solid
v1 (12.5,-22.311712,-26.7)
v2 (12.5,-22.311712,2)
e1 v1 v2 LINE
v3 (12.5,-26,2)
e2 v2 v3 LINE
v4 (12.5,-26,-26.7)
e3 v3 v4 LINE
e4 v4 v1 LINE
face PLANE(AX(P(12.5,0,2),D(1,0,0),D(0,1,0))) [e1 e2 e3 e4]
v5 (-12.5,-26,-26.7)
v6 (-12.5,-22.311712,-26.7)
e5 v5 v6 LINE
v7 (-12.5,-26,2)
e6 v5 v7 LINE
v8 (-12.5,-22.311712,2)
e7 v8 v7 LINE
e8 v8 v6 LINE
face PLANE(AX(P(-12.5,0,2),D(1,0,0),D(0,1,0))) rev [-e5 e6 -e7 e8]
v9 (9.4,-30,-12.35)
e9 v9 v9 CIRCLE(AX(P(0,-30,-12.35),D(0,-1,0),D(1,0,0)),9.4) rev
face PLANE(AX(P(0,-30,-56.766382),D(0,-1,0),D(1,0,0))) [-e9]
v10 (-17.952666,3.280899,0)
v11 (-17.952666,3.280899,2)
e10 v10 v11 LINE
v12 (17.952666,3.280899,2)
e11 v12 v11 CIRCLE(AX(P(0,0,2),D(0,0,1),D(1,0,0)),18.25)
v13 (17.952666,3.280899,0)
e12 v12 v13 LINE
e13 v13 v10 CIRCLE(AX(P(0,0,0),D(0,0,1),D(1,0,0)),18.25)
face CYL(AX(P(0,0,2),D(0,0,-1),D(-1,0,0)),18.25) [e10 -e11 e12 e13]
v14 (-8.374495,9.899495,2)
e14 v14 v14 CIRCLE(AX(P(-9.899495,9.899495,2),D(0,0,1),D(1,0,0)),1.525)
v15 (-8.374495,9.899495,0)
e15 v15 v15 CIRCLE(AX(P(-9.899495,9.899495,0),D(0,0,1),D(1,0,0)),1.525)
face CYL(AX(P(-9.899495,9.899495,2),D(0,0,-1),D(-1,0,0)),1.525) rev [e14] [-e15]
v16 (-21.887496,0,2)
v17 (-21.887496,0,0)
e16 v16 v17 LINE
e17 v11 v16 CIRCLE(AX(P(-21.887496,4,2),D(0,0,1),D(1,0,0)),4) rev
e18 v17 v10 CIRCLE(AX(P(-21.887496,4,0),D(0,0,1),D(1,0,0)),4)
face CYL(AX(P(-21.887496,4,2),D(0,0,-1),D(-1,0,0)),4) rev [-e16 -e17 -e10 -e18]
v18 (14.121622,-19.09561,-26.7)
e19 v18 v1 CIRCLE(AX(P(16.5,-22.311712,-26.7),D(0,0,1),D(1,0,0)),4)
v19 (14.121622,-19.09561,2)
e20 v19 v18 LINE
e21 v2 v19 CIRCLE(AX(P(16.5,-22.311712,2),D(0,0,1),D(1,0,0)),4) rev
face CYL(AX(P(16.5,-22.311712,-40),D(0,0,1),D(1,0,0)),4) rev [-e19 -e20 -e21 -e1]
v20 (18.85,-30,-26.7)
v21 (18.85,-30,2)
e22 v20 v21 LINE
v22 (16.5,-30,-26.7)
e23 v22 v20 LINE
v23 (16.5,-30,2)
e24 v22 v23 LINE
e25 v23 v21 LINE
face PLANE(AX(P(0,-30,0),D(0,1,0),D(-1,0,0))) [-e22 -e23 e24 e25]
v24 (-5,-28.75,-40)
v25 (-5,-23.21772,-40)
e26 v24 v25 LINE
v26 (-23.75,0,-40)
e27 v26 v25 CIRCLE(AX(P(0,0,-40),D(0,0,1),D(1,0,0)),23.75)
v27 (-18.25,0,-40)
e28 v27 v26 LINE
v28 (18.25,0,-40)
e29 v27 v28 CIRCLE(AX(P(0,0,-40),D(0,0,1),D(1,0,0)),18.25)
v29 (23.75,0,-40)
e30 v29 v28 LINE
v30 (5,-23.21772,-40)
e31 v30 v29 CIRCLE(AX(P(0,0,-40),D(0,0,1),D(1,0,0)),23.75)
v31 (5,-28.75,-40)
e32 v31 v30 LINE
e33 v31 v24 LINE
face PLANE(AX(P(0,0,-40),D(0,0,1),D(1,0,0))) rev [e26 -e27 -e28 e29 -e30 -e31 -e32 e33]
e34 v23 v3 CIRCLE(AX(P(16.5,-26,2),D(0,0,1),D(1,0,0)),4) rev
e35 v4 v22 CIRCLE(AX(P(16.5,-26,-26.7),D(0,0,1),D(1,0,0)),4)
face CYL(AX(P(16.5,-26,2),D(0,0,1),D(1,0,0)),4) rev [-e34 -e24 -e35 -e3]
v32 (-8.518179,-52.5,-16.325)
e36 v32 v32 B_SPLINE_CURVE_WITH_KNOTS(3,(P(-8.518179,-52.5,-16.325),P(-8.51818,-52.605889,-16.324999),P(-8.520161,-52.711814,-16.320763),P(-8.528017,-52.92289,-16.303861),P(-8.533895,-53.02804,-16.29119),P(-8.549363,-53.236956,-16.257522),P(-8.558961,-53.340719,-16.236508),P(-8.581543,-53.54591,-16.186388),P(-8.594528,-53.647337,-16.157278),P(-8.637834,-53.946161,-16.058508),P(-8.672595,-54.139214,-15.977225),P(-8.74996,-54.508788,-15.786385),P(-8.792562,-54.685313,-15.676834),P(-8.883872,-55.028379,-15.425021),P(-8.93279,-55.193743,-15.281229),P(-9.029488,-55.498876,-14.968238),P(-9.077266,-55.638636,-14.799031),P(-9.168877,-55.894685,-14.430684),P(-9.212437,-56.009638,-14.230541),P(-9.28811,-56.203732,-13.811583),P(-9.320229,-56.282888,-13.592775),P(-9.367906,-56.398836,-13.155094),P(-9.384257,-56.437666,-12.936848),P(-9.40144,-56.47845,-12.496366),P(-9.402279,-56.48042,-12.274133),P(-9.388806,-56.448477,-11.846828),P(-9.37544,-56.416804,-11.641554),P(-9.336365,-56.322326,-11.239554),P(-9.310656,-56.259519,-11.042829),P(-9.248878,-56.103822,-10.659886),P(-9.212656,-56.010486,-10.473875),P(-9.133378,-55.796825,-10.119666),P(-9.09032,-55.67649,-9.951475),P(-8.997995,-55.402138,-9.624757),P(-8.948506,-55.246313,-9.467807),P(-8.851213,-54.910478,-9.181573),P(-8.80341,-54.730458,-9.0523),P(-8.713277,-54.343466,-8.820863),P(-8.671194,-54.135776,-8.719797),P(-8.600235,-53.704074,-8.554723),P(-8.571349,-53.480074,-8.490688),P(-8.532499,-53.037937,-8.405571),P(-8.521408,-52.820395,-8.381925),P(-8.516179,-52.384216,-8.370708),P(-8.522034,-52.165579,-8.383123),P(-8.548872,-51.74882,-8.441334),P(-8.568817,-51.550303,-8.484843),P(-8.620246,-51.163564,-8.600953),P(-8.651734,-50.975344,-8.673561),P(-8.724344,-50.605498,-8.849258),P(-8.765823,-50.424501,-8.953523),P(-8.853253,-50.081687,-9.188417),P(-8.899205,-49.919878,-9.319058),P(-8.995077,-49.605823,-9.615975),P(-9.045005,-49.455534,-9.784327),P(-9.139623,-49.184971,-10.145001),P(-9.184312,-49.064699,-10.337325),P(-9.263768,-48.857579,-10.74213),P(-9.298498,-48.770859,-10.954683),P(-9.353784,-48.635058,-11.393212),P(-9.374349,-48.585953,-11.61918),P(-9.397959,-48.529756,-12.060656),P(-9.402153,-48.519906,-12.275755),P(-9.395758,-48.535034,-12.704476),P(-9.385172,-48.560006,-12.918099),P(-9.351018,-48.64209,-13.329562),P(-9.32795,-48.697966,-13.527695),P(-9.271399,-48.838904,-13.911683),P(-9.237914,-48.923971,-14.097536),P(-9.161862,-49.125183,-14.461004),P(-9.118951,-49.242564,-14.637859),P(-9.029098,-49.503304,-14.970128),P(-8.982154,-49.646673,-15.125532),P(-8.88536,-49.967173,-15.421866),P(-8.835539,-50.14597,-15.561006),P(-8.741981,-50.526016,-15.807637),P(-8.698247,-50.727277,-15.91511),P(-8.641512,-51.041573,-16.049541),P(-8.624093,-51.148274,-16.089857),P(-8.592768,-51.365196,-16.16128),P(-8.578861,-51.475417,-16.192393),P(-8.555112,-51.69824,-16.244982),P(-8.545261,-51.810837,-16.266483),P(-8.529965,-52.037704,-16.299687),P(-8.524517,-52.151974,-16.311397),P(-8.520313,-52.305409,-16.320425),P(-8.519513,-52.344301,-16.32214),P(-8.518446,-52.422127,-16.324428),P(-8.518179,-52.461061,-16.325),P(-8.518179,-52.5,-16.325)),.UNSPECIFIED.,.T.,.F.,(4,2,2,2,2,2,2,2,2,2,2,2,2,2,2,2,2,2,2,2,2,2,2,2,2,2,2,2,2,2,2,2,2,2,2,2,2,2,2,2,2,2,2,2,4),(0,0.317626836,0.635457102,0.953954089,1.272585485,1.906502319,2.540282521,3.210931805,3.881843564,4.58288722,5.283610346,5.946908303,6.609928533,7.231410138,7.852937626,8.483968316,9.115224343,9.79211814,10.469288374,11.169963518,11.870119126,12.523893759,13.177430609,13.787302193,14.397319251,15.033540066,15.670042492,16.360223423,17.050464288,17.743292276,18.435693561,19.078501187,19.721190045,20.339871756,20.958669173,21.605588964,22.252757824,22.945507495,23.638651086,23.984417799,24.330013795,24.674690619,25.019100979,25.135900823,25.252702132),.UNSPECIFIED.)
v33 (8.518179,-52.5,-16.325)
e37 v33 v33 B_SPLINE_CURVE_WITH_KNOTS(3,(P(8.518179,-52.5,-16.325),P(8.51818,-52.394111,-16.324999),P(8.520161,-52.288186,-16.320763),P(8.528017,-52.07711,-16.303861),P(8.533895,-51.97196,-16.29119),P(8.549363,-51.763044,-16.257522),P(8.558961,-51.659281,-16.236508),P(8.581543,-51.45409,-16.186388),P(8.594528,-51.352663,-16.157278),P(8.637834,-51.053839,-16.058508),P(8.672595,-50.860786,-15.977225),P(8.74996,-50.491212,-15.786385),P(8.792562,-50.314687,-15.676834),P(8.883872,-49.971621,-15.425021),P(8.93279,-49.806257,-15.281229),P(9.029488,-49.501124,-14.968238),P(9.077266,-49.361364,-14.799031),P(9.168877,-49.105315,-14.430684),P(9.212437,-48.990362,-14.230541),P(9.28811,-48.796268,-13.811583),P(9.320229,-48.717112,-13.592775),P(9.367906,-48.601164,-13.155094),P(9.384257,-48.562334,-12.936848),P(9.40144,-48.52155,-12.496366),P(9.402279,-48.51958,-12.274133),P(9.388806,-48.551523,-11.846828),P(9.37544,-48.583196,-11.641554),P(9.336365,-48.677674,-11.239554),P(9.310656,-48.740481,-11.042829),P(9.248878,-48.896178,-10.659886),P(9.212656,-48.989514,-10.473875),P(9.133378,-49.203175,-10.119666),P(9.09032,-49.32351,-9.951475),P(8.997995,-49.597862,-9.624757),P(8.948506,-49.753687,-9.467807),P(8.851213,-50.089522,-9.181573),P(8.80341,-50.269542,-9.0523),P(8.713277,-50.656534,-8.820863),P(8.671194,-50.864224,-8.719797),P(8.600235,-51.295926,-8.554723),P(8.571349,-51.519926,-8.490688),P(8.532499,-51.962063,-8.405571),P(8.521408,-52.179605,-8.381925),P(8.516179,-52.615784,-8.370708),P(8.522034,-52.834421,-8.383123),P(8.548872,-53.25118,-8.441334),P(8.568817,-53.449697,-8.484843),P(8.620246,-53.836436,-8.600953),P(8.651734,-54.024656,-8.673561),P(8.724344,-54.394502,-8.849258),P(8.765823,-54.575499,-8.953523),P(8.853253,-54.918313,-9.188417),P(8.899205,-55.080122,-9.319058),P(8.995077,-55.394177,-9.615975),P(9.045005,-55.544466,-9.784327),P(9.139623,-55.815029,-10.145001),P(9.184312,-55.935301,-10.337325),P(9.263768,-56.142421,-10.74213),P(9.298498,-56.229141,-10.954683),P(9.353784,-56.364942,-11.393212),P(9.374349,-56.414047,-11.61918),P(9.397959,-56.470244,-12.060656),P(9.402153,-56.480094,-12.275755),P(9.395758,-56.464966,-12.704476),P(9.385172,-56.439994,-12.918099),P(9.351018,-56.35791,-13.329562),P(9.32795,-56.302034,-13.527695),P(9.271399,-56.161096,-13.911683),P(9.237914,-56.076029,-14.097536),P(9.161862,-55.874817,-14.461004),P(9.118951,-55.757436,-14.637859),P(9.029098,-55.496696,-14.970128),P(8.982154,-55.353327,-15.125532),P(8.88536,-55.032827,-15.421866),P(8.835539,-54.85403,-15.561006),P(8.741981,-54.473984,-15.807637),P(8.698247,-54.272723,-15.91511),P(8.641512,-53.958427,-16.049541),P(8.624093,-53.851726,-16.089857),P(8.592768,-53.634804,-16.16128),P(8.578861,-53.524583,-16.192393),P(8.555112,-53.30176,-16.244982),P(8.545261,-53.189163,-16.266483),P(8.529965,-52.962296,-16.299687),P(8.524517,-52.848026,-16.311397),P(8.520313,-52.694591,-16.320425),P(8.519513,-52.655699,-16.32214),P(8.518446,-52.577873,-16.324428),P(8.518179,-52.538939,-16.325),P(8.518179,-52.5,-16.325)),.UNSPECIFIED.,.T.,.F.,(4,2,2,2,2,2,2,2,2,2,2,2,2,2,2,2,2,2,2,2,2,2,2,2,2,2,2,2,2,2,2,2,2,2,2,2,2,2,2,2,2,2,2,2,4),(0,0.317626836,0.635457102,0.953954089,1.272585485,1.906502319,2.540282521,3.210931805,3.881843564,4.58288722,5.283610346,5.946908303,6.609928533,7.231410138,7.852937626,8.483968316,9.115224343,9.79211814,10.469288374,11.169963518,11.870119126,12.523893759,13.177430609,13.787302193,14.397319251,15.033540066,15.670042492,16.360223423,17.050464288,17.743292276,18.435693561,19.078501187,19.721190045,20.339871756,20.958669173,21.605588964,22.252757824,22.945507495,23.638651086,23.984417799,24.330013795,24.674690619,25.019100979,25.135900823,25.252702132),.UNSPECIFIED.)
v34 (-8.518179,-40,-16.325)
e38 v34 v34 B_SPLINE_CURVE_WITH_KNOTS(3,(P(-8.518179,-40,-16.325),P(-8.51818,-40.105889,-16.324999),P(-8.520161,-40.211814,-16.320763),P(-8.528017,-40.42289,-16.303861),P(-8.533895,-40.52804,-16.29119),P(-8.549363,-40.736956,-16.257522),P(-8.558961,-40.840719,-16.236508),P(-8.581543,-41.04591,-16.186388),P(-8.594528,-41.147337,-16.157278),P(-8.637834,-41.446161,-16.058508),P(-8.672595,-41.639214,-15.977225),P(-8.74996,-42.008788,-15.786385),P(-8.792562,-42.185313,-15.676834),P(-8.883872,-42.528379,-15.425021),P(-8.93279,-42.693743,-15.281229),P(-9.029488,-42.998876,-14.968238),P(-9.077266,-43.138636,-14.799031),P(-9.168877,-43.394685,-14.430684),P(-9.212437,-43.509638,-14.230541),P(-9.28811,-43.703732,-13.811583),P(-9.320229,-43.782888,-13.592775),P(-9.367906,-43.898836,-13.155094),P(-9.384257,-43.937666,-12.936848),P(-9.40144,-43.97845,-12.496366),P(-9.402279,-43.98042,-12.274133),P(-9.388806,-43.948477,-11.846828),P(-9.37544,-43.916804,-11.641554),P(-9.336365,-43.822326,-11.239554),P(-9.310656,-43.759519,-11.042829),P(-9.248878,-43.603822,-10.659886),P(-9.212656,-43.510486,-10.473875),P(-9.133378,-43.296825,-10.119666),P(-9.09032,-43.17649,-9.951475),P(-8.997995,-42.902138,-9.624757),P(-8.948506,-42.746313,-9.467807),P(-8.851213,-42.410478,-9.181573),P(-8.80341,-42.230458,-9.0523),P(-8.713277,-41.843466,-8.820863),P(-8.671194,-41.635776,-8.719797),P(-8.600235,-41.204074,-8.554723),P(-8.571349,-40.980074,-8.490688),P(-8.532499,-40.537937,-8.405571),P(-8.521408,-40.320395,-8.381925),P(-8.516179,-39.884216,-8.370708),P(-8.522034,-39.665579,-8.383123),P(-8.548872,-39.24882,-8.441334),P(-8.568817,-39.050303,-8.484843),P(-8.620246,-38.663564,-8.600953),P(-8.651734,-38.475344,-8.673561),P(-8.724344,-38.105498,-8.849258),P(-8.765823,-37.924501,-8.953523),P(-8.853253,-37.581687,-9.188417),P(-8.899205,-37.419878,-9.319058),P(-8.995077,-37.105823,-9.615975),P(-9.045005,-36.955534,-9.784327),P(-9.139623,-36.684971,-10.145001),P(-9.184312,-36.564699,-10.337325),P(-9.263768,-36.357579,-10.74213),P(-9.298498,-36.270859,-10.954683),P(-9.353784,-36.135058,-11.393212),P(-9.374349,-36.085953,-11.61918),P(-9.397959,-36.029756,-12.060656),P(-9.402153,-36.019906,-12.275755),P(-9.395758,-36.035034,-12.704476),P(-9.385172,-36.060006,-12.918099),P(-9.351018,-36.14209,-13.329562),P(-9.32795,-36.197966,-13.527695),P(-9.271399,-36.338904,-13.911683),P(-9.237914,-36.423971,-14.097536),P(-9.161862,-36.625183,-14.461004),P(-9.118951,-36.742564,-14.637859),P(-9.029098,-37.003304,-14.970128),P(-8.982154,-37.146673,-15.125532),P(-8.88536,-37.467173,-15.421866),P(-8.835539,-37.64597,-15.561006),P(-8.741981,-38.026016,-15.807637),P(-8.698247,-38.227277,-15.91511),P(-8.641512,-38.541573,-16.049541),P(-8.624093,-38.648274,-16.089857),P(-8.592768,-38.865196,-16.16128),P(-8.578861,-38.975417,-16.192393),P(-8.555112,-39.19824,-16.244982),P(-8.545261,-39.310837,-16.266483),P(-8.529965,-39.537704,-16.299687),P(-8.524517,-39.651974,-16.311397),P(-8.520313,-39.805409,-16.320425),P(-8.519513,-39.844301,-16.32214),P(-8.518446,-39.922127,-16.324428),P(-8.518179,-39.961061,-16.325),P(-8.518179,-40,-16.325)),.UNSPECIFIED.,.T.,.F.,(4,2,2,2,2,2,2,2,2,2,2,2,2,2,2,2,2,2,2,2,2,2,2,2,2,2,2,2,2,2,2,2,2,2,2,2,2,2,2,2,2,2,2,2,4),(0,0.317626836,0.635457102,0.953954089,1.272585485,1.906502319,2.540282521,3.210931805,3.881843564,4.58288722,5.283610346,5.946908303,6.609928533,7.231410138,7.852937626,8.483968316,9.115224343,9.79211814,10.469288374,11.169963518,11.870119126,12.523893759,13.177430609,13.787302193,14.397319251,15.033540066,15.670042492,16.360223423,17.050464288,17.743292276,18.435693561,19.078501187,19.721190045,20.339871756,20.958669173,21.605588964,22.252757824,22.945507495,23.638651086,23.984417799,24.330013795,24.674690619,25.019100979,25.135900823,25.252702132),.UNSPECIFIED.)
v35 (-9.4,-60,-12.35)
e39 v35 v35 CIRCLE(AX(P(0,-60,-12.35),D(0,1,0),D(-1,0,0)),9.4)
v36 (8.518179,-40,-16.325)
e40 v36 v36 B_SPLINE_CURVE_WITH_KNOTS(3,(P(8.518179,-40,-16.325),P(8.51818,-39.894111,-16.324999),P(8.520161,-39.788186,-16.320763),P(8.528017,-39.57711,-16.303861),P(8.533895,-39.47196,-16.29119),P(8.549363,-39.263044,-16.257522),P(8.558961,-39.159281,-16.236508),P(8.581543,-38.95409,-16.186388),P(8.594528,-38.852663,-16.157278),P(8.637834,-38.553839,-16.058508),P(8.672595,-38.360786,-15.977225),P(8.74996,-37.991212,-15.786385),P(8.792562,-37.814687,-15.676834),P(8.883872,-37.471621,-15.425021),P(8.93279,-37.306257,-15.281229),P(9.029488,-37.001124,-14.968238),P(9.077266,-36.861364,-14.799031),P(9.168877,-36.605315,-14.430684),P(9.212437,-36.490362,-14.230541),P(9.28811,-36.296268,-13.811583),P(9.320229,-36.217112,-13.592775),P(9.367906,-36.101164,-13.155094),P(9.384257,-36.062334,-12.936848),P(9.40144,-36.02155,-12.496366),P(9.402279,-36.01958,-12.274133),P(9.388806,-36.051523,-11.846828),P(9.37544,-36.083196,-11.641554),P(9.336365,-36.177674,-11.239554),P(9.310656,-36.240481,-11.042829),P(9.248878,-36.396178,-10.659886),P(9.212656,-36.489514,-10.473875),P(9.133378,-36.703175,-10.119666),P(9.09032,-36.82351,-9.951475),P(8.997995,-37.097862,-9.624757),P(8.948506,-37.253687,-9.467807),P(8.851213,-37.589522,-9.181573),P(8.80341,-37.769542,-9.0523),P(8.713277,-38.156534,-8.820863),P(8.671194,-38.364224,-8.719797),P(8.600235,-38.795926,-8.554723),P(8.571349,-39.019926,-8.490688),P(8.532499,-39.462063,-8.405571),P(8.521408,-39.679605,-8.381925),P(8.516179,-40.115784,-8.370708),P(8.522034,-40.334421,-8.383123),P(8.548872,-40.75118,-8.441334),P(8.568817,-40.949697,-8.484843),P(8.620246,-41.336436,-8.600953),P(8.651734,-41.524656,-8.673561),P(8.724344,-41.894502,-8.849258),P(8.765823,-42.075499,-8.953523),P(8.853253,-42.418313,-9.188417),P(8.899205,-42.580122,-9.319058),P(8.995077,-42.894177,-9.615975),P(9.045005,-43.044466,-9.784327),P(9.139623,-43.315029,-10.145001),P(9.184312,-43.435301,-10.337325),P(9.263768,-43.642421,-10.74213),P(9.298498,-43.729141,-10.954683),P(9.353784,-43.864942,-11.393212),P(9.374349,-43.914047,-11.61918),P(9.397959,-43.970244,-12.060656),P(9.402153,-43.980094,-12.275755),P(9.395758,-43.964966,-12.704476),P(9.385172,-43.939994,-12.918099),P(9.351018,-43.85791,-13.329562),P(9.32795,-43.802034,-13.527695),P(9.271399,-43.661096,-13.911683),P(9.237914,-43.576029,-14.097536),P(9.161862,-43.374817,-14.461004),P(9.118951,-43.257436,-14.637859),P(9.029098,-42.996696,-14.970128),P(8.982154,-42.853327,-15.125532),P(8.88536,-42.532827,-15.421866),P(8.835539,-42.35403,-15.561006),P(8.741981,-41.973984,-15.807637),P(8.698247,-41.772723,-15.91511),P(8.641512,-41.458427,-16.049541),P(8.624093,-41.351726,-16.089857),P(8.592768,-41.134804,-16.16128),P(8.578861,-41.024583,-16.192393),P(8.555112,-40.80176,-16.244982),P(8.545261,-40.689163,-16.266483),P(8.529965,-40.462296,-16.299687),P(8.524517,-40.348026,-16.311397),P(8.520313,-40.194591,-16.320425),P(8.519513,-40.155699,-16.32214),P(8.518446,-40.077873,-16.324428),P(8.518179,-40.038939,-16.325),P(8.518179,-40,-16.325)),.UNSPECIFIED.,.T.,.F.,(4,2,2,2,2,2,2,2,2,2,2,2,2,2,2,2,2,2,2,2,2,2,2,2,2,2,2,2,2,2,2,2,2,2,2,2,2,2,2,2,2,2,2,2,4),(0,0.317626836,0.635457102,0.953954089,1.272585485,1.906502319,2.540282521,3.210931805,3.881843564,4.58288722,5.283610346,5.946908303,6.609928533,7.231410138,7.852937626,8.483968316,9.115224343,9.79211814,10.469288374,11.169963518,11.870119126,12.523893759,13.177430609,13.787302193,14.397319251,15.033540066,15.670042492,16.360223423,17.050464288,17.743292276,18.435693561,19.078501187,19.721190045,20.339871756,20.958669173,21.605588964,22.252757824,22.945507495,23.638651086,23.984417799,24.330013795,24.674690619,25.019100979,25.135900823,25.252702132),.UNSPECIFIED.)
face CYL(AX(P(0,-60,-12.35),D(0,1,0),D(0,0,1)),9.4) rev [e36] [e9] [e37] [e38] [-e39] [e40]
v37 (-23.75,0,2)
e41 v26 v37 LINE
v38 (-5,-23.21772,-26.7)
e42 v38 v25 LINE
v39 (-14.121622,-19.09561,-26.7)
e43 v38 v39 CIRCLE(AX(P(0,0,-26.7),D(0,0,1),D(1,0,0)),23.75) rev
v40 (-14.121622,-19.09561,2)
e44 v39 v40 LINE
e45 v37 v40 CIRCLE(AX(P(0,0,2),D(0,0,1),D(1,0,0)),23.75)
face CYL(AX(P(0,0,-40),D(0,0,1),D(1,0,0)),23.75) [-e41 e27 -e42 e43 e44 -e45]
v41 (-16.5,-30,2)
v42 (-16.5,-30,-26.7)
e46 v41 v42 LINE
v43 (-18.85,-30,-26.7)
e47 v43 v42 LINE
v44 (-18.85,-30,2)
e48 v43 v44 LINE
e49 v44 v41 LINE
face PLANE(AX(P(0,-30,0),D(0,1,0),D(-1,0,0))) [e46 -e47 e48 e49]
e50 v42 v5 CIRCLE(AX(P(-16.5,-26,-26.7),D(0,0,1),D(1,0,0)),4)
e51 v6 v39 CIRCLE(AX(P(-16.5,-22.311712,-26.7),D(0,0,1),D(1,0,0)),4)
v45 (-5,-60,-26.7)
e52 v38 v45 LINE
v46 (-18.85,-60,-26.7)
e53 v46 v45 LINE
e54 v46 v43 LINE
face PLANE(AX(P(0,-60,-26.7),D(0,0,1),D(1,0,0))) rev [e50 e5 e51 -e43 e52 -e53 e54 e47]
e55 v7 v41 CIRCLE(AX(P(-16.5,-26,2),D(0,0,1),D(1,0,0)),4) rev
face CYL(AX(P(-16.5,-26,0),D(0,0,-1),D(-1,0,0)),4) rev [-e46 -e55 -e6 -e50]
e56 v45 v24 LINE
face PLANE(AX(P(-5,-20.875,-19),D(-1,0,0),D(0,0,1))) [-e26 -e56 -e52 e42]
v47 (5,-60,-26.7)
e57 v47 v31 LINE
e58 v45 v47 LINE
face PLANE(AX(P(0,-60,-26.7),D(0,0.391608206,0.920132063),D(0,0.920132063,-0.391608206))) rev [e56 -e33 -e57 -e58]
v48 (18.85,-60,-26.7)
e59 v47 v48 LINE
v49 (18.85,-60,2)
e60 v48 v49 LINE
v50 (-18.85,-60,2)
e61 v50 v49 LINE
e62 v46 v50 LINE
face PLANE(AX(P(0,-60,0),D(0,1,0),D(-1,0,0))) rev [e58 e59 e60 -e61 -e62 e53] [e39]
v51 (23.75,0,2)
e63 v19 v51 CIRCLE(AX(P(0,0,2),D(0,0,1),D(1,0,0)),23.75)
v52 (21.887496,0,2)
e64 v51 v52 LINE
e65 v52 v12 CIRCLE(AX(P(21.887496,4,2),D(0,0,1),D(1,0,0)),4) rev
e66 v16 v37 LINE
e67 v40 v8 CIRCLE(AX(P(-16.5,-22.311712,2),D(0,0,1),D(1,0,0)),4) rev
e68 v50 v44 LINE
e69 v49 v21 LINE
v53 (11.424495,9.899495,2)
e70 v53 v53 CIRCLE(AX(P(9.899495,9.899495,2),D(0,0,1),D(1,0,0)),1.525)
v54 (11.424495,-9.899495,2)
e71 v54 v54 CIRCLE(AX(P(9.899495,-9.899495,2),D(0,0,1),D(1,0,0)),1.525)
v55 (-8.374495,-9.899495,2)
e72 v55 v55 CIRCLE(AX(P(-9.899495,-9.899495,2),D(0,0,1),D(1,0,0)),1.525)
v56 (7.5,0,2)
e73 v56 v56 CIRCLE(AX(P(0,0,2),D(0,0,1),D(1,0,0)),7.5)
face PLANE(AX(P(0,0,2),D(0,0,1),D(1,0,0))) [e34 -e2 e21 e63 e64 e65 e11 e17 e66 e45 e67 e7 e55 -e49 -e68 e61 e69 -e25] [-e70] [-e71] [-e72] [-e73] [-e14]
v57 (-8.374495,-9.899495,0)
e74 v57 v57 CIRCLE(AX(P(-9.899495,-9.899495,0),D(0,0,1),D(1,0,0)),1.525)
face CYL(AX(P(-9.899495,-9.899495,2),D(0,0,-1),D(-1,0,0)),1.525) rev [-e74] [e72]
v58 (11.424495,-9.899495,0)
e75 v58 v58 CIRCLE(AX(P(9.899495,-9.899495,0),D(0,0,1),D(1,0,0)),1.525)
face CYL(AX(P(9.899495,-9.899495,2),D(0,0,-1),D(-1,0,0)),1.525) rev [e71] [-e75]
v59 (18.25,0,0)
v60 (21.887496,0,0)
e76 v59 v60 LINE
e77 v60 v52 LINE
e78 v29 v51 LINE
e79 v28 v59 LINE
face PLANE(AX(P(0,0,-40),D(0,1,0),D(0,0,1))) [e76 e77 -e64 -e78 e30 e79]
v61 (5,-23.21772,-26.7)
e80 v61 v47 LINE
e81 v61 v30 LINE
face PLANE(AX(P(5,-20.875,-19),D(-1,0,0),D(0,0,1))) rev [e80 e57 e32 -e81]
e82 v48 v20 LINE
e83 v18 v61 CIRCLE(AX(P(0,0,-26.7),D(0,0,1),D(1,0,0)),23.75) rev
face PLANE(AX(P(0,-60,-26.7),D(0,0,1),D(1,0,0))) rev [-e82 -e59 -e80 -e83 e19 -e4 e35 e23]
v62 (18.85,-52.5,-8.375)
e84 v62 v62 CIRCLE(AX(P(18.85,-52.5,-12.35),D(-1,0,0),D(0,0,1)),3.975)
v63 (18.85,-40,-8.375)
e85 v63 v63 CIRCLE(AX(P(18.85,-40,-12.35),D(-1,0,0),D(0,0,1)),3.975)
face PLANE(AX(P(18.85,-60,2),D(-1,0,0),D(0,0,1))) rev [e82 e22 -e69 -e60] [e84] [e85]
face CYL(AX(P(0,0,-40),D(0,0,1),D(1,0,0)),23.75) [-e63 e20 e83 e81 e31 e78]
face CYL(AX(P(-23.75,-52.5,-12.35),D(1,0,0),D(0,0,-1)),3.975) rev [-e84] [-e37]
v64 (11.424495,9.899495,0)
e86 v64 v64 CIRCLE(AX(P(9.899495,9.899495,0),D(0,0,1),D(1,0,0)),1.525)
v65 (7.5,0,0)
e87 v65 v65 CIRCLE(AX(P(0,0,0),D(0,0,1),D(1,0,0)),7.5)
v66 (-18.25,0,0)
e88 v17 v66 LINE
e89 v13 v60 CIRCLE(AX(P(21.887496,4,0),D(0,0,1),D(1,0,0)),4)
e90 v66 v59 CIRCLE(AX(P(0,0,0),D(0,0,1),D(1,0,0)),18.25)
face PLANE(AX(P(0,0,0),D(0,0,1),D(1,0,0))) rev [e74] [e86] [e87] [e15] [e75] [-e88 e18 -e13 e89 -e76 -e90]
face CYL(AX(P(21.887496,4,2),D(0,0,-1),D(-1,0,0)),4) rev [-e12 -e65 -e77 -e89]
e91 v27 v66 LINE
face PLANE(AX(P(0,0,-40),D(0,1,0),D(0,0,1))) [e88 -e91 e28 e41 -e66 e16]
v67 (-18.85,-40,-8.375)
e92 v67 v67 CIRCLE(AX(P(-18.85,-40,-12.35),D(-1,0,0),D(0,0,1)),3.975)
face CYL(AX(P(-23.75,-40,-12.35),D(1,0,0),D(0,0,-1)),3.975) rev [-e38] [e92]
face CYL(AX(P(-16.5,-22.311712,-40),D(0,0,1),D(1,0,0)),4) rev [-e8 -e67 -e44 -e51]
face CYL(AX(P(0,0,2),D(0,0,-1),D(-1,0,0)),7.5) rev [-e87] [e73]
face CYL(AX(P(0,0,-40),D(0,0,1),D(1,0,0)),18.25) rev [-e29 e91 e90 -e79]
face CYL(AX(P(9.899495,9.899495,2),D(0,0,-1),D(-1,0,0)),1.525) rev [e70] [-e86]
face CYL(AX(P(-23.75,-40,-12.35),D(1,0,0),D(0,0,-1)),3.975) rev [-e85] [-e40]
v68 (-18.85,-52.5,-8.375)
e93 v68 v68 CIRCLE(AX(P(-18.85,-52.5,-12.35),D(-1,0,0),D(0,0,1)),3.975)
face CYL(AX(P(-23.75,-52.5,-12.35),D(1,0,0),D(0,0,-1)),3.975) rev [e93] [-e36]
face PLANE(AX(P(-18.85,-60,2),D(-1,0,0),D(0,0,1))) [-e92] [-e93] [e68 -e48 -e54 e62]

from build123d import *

# Parameters (mm, degrees)
SKETCH2_R               = 1.525
SKETCH2_R_2             = 7.5
BOSS_EXTRUDE3_DEPTH     = 2
BOSS_EXTRUDE4_START     = -40
BOSS_EXTRUDE4_DEPTH     = 42
BOSS_EXTRUDE6_START     = -30
SKETCH7_W               = 37.7
SKETCH7_H               = 28.7
SKETCH7_R               = 9.4
BOSS_EXTRUDE6_DEPTH     = 30
BOSS_EXTRUDE7_START     = -26.7
BOSS_EXTRUDE7_DEPTH     = 26.7
CUT_EXTRUDE1_DEPTH      = 76.921423195
CUT_EXTRUDE1_DEPTH_BACK = 76.921423195
SKETCH6_R               = 3.975
RIB3_START              = -5
RIB3_DEPTH              = 10
FILLET2_R               = 4


# Read off the part's stored shape, not the designer's step: Rib3
with BuildPart() as part:
    # Sketch2 → Boss-Extrude3 (new body)
    with BuildSketch(Plane.XY):
        with BuildLine():
            Line((12.5, -30), (12.5, -13.297086147))
            ThreePointArc((12.5, -13.297086147), (0, 18.25), (-12.5, -13.297086147))
            Line((-12.5, -13.297086147), (-12.5, -30))
            Line((-12.5, -30), (12.5, -30))
        make_face()
        with Locations((9.899494937, -9.899494937)):
            Circle(SKETCH2_R, mode=Mode.SUBTRACT)
        with Locations((-9.899494937, -9.899494937)):
            Circle(SKETCH2_R, mode=Mode.SUBTRACT)
        with Locations((-9.899494937, 9.899494937)):
            Circle(SKETCH2_R, mode=Mode.SUBTRACT)
        with Locations((9.899494937, 9.899494937)):
            Circle(SKETCH2_R, mode=Mode.SUBTRACT)
        Circle(SKETCH2_R_2, mode=Mode.SUBTRACT)
    extrude(amount=BOSS_EXTRUDE3_DEPTH)

    # Sketch3 → Boss-Extrude4 (add)
    with BuildSketch(Plane.XY.offset(BOSS_EXTRUDE4_START)):
        with BuildLine():
            Line((23.75, 0), (18.25, 0))
            ThreePointArc((18.25, 0), (0, -18.25), (-18.25, 0))
            Line((-18.25, 0), (-23.75, 0))
            ThreePointArc((-23.75, 0), (0, -23.75), (23.75, 0))
        make_face()
    extrude(amount=BOSS_EXTRUDE4_DEPTH)

    # Sketch7 → Boss-Extrude6 (add)
    with BuildSketch(Plane(origin=(0, 0, 0), x_dir=(1, 0, 0), z_dir=(0, 1, 0)).offset(BOSS_EXTRUDE6_START)):
        with Locations((0, 12.35)):
            Rectangle(SKETCH7_W, SKETCH7_H)
        with Locations(Location((0, 12.35, 0), (0, 0, 180))):
            Circle(SKETCH7_R, mode=Mode.SUBTRACT)
    extrude(amount=-BOSS_EXTRUDE6_DEPTH)

    # Sketch2<8> → Boss-Extrude7 (add)
    with BuildSketch(Plane.XY.offset(BOSS_EXTRUDE7_START)):
        with BuildLine():
            Line((12.5, -30), (12.5, -13.297086147))
            ThreePointArc((12.5, -13.297086147), (0, -18.25), (-12.5, -13.297086147))
            Line((-12.5, -13.297086147), (-12.5, -30))
            Line((-12.5, -30), (12.5, -30))
        make_face()
    extrude(amount=BOSS_EXTRUDE7_DEPTH)

    # Sketch6 → Cut-Extrude1 (cut, two sides: drawn at the far end of the back side and taken through both)
    with BuildSketch(Plane(origin=(0, 0, 0), x_dir=(0, 0, -1), z_dir=(1, 0, 0)).offset(-CUT_EXTRUDE1_DEPTH_BACK)):
        with Locations((12.35, -40)):
            Circle(SKETCH6_R)
        with Locations((12.35, -52.5)):
            Circle(SKETCH6_R)
    extrude(amount=CUT_EXTRUDE1_DEPTH + CUT_EXTRUDE1_DEPTH_BACK, mode=Mode.SUBTRACT)

    # Rib3 outline → Rib3 (add)
    with BuildSketch(Plane(origin=(0, -60, 0), x_dir=(0, -1, 0), z_dir=(-1, 0, 0)).offset(RIB3_START)):
        Polygon((-38, -40), (-31.25, -40), (0, -26.7), (-38, -26.7), align=None)
    extrude(amount=RIB3_DEPTH)

    # Fillet2
    fillet2_edges = [part.edges().sort_by_distance(p)[0] for p in [
        (12.5, -30, -12.35),
        (-12.5, -30, -12.35),
        (-18.25, 0, 1),
        (12.5, -20.194368027, -12.35),
        (18.25, 0, 1),
        (-12.5, -20.194368027, -12.35),
    ]]
    fillet(fillet2_edges, radius=FILLET2_R)


solid = part.part
